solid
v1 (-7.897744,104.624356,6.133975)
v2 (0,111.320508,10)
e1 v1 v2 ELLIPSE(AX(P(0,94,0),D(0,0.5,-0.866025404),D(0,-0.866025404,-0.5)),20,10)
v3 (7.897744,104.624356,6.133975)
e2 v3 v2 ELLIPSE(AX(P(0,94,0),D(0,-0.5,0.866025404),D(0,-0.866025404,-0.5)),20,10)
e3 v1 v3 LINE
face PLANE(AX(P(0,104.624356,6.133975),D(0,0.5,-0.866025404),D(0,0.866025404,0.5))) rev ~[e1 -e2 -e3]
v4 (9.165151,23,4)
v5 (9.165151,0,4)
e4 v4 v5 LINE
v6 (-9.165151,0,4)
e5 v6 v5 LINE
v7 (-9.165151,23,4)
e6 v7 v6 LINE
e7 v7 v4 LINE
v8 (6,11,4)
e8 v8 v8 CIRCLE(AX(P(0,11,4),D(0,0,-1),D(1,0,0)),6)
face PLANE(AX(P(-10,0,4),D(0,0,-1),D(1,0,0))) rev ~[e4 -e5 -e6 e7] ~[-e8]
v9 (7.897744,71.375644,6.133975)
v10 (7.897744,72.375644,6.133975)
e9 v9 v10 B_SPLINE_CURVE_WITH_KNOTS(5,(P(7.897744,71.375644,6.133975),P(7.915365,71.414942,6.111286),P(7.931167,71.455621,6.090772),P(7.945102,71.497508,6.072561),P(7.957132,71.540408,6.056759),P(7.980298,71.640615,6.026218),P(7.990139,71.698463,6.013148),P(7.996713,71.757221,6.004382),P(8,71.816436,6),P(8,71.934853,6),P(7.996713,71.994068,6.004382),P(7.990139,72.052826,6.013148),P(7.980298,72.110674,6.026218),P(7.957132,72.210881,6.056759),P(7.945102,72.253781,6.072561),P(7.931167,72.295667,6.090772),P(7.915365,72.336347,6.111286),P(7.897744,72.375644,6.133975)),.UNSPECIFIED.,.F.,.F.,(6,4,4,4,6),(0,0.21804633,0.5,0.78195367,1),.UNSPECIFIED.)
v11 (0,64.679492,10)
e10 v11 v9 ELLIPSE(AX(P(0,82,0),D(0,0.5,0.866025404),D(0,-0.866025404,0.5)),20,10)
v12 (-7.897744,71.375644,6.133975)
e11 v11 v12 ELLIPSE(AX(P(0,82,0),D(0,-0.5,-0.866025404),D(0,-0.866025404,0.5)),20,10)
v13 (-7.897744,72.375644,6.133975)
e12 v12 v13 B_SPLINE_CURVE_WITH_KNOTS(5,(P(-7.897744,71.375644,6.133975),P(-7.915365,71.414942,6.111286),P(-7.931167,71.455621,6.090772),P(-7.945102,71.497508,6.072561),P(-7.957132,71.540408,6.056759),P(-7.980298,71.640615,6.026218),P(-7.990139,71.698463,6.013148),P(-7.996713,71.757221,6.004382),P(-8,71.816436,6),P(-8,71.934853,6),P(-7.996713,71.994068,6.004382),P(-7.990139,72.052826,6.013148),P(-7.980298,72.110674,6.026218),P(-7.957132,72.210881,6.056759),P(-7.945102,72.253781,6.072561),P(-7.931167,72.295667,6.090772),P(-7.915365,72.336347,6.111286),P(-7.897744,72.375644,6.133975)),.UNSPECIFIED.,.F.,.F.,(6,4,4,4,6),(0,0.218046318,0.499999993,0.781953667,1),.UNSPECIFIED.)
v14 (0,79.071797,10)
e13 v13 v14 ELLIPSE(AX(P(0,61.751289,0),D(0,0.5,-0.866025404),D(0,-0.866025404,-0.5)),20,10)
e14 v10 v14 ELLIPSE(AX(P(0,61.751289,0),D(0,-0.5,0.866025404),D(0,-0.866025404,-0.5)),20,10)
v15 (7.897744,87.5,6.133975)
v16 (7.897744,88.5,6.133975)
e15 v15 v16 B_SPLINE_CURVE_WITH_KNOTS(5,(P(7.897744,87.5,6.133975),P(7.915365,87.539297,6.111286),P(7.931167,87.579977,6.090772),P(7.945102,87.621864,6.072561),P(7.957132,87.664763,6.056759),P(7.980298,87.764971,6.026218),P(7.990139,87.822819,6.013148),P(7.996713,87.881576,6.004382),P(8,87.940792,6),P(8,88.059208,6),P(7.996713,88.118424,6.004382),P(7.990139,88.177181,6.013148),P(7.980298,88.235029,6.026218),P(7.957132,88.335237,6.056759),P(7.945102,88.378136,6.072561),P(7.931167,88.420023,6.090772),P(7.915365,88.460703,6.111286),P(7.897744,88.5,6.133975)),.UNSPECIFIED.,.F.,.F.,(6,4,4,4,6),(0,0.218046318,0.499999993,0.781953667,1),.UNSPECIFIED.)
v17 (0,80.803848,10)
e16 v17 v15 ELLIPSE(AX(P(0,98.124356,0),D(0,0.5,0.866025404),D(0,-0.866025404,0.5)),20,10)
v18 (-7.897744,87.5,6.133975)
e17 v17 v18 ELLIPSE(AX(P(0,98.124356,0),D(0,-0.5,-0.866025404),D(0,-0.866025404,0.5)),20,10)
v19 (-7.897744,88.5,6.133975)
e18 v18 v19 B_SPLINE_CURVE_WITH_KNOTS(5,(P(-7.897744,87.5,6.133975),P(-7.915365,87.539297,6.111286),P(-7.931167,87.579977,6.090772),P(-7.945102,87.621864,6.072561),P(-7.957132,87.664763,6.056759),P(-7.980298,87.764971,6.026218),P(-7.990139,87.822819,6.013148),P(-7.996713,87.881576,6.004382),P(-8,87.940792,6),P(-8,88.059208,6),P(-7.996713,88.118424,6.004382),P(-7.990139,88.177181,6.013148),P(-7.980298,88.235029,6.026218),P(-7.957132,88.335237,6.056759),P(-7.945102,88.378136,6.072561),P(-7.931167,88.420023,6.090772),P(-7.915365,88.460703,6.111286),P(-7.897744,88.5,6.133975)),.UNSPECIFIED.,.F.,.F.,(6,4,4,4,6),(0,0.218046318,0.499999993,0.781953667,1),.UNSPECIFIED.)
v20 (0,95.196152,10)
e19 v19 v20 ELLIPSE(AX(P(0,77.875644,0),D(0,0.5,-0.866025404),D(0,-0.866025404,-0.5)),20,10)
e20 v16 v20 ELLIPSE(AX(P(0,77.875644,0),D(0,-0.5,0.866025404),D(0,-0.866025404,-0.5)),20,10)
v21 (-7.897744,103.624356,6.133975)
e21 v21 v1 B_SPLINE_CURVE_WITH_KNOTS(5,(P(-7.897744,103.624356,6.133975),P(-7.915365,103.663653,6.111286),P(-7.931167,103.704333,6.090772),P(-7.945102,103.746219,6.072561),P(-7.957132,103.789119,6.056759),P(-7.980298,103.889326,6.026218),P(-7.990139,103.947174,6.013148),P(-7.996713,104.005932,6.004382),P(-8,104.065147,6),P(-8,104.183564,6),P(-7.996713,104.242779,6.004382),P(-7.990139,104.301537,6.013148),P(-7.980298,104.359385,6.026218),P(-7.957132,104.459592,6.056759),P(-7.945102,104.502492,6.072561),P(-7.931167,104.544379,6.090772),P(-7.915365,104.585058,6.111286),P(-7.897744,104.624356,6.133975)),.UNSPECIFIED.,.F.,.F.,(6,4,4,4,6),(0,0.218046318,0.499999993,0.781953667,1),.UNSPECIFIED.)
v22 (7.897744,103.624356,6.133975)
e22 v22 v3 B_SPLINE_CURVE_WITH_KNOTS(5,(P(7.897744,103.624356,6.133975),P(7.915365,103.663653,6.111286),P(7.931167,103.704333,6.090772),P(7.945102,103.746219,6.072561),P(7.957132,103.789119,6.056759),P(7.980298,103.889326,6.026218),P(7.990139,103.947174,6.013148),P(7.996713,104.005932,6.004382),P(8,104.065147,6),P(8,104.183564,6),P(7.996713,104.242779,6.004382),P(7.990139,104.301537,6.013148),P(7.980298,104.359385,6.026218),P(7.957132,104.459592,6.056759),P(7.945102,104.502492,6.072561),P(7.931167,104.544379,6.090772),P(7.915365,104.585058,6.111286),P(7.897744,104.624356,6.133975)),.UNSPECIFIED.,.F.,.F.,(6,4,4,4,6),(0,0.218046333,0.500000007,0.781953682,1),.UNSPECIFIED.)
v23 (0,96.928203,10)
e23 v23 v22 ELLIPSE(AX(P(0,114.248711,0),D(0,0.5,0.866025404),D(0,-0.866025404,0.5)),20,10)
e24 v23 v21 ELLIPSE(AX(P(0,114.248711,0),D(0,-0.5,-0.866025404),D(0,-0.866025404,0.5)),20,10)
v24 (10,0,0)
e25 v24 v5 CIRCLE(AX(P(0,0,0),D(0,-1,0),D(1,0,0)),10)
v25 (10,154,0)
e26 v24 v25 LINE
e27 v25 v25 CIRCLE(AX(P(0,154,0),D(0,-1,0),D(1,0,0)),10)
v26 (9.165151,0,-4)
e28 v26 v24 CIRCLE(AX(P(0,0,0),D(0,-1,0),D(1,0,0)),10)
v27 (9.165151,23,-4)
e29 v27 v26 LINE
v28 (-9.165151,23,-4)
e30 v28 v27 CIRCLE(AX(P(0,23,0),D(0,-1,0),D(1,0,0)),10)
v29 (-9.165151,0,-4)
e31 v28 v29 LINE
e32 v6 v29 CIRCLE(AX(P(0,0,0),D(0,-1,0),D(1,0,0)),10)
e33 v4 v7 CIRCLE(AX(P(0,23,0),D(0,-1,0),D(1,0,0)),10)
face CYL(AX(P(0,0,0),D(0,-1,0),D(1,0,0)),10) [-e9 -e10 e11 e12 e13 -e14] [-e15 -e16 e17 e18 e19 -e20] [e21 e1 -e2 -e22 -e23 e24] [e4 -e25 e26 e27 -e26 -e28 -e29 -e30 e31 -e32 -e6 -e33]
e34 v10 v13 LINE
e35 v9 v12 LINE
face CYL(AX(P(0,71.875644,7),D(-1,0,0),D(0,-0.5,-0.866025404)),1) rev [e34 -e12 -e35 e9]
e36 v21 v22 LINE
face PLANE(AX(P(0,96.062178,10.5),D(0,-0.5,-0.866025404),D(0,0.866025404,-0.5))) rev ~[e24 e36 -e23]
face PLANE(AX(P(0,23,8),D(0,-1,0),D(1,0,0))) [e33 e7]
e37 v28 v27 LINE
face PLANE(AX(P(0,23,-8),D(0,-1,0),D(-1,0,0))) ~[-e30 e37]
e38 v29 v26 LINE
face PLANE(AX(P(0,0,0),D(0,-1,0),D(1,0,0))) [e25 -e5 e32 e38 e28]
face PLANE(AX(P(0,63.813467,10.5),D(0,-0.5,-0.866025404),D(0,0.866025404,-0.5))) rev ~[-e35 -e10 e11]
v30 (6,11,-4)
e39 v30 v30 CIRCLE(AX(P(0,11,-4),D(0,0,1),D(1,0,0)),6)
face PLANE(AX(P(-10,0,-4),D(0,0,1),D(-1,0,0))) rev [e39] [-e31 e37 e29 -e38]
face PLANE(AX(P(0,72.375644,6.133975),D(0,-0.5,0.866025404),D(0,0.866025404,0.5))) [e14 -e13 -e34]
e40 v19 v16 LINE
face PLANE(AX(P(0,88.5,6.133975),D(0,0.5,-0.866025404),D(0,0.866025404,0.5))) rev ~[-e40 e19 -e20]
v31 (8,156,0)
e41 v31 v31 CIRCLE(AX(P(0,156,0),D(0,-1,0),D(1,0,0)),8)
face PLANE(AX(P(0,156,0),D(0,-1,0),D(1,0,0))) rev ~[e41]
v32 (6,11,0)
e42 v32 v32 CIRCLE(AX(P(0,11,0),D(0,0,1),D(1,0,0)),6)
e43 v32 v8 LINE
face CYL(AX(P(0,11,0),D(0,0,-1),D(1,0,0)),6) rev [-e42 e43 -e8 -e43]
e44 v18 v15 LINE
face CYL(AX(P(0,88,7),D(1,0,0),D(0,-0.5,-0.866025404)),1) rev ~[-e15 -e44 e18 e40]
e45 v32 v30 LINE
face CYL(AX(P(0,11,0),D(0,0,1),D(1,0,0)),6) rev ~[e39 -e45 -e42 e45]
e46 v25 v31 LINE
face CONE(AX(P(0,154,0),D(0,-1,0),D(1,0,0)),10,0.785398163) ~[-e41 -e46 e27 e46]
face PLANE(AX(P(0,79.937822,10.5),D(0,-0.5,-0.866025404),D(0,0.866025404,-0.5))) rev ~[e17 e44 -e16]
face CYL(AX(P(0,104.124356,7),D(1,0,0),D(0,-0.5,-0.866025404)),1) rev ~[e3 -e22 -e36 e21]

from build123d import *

# Parameters (mm, degrees)
F0_R          = 10
F1_DEPTH      = 156
F2_SIZE       = 2
F3_W          = 20
F3_H          = 8
F4_DEPTH      = 23
F5_R          = 6
F6_DEPTH      = 10.001
F6_DEPTH_BACK = 10.001
F8_DEPTH      = 10.001
F8_DEPTH_BACK = 10.001


# Not quite as in the source:
# - a pattern or mirror of a feature is missing from the dataset's text; its kind, count and spacing are read off the source's solid


with BuildPart() as f1:
    # F0 (on Front) → F1 (new body)
    with BuildSketch(Plane.XZ):
        Circle(F0_R)
    extrude(amount=-F1_DEPTH)

    # F2
    f2_edges = [f1.edges().sort_by_distance(p)[0] for p in [
        (-10, 156, 0),
    ]]
    chamfer(f2_edges, length=F2_SIZE)

    # F3 (on Front) → F4 (cut)
    with BuildSketch(Plane.XZ):
        with Locations((0, 8)):
            Rectangle(F3_W, F3_H)
    f4 = extrude(amount=-F4_DEPTH, mode=Mode.SUBTRACT)

    # F4_copies: F4 across plane
    add(f4.mirror(Plane(origin=(0, 0, 0), x_dir=(-1, 0, 0), z_dir=(0, 0, -1))), mode=Mode.SUBTRACT)

    # F5 (on Top) → F6 (cut, two sides)
    with BuildSketch(Plane.XY) as f6_sk:
        with Locations((0, 11)):
            Circle(F5_R)
    extrude(amount=-F6_DEPTH, mode=Mode.SUBTRACT)
    extrude(f6_sk.sketch, amount=F6_DEPTH_BACK, mode=Mode.SUBTRACT)

    # F7 (on Right) → F8 (cut, two sides)
    with BuildSketch(Plane.YZ) as f8_sk:
        with BuildLine():
            Line((96.0621778265, 10.5), (79.9378221735, 10.5))
            Line((79.9378221735, 10.5), (87.5, 6.1339745962))
            ThreePointArc((87.5, 6.1339745962), (88, 6), (88.5, 6.1339745962))
            Line((88.5, 6.1339745962), (96.0621778265, 10.5))
        make_face()
        with BuildLine():
            Line((112.1865334795, 10.5), (96.0621778265, 10.5))
            Line((96.0621778265, 10.5), (103.624355653, 6.1339745962))
            ThreePointArc((103.624355653, 6.1339745962), (104.124355653, 6), (104.624355653, 6.1339745962))
            Line((104.624355653, 6.1339745962), (112.1865334795, 10.5))
        make_face()
        with BuildLine():
            Line((72.375644347, 6.1339745962), (79.9378221735, 10.5))
            Line((79.9378221735, 10.5), (63.8134665205, 10.5))
            Line((63.8134665205, 10.5), (71.375644347, 6.1339745962))
            ThreePointArc((71.375644347, 6.1339745962), (71.875644347, 6), (72.375644347, 6.1339745962))
        make_face()
    extrude(amount=-F8_DEPTH, mode=Mode.SUBTRACT)
    extrude(f8_sk.sketch, amount=F8_DEPTH_BACK, mode=Mode.SUBTRACT)


solid = f1.part
